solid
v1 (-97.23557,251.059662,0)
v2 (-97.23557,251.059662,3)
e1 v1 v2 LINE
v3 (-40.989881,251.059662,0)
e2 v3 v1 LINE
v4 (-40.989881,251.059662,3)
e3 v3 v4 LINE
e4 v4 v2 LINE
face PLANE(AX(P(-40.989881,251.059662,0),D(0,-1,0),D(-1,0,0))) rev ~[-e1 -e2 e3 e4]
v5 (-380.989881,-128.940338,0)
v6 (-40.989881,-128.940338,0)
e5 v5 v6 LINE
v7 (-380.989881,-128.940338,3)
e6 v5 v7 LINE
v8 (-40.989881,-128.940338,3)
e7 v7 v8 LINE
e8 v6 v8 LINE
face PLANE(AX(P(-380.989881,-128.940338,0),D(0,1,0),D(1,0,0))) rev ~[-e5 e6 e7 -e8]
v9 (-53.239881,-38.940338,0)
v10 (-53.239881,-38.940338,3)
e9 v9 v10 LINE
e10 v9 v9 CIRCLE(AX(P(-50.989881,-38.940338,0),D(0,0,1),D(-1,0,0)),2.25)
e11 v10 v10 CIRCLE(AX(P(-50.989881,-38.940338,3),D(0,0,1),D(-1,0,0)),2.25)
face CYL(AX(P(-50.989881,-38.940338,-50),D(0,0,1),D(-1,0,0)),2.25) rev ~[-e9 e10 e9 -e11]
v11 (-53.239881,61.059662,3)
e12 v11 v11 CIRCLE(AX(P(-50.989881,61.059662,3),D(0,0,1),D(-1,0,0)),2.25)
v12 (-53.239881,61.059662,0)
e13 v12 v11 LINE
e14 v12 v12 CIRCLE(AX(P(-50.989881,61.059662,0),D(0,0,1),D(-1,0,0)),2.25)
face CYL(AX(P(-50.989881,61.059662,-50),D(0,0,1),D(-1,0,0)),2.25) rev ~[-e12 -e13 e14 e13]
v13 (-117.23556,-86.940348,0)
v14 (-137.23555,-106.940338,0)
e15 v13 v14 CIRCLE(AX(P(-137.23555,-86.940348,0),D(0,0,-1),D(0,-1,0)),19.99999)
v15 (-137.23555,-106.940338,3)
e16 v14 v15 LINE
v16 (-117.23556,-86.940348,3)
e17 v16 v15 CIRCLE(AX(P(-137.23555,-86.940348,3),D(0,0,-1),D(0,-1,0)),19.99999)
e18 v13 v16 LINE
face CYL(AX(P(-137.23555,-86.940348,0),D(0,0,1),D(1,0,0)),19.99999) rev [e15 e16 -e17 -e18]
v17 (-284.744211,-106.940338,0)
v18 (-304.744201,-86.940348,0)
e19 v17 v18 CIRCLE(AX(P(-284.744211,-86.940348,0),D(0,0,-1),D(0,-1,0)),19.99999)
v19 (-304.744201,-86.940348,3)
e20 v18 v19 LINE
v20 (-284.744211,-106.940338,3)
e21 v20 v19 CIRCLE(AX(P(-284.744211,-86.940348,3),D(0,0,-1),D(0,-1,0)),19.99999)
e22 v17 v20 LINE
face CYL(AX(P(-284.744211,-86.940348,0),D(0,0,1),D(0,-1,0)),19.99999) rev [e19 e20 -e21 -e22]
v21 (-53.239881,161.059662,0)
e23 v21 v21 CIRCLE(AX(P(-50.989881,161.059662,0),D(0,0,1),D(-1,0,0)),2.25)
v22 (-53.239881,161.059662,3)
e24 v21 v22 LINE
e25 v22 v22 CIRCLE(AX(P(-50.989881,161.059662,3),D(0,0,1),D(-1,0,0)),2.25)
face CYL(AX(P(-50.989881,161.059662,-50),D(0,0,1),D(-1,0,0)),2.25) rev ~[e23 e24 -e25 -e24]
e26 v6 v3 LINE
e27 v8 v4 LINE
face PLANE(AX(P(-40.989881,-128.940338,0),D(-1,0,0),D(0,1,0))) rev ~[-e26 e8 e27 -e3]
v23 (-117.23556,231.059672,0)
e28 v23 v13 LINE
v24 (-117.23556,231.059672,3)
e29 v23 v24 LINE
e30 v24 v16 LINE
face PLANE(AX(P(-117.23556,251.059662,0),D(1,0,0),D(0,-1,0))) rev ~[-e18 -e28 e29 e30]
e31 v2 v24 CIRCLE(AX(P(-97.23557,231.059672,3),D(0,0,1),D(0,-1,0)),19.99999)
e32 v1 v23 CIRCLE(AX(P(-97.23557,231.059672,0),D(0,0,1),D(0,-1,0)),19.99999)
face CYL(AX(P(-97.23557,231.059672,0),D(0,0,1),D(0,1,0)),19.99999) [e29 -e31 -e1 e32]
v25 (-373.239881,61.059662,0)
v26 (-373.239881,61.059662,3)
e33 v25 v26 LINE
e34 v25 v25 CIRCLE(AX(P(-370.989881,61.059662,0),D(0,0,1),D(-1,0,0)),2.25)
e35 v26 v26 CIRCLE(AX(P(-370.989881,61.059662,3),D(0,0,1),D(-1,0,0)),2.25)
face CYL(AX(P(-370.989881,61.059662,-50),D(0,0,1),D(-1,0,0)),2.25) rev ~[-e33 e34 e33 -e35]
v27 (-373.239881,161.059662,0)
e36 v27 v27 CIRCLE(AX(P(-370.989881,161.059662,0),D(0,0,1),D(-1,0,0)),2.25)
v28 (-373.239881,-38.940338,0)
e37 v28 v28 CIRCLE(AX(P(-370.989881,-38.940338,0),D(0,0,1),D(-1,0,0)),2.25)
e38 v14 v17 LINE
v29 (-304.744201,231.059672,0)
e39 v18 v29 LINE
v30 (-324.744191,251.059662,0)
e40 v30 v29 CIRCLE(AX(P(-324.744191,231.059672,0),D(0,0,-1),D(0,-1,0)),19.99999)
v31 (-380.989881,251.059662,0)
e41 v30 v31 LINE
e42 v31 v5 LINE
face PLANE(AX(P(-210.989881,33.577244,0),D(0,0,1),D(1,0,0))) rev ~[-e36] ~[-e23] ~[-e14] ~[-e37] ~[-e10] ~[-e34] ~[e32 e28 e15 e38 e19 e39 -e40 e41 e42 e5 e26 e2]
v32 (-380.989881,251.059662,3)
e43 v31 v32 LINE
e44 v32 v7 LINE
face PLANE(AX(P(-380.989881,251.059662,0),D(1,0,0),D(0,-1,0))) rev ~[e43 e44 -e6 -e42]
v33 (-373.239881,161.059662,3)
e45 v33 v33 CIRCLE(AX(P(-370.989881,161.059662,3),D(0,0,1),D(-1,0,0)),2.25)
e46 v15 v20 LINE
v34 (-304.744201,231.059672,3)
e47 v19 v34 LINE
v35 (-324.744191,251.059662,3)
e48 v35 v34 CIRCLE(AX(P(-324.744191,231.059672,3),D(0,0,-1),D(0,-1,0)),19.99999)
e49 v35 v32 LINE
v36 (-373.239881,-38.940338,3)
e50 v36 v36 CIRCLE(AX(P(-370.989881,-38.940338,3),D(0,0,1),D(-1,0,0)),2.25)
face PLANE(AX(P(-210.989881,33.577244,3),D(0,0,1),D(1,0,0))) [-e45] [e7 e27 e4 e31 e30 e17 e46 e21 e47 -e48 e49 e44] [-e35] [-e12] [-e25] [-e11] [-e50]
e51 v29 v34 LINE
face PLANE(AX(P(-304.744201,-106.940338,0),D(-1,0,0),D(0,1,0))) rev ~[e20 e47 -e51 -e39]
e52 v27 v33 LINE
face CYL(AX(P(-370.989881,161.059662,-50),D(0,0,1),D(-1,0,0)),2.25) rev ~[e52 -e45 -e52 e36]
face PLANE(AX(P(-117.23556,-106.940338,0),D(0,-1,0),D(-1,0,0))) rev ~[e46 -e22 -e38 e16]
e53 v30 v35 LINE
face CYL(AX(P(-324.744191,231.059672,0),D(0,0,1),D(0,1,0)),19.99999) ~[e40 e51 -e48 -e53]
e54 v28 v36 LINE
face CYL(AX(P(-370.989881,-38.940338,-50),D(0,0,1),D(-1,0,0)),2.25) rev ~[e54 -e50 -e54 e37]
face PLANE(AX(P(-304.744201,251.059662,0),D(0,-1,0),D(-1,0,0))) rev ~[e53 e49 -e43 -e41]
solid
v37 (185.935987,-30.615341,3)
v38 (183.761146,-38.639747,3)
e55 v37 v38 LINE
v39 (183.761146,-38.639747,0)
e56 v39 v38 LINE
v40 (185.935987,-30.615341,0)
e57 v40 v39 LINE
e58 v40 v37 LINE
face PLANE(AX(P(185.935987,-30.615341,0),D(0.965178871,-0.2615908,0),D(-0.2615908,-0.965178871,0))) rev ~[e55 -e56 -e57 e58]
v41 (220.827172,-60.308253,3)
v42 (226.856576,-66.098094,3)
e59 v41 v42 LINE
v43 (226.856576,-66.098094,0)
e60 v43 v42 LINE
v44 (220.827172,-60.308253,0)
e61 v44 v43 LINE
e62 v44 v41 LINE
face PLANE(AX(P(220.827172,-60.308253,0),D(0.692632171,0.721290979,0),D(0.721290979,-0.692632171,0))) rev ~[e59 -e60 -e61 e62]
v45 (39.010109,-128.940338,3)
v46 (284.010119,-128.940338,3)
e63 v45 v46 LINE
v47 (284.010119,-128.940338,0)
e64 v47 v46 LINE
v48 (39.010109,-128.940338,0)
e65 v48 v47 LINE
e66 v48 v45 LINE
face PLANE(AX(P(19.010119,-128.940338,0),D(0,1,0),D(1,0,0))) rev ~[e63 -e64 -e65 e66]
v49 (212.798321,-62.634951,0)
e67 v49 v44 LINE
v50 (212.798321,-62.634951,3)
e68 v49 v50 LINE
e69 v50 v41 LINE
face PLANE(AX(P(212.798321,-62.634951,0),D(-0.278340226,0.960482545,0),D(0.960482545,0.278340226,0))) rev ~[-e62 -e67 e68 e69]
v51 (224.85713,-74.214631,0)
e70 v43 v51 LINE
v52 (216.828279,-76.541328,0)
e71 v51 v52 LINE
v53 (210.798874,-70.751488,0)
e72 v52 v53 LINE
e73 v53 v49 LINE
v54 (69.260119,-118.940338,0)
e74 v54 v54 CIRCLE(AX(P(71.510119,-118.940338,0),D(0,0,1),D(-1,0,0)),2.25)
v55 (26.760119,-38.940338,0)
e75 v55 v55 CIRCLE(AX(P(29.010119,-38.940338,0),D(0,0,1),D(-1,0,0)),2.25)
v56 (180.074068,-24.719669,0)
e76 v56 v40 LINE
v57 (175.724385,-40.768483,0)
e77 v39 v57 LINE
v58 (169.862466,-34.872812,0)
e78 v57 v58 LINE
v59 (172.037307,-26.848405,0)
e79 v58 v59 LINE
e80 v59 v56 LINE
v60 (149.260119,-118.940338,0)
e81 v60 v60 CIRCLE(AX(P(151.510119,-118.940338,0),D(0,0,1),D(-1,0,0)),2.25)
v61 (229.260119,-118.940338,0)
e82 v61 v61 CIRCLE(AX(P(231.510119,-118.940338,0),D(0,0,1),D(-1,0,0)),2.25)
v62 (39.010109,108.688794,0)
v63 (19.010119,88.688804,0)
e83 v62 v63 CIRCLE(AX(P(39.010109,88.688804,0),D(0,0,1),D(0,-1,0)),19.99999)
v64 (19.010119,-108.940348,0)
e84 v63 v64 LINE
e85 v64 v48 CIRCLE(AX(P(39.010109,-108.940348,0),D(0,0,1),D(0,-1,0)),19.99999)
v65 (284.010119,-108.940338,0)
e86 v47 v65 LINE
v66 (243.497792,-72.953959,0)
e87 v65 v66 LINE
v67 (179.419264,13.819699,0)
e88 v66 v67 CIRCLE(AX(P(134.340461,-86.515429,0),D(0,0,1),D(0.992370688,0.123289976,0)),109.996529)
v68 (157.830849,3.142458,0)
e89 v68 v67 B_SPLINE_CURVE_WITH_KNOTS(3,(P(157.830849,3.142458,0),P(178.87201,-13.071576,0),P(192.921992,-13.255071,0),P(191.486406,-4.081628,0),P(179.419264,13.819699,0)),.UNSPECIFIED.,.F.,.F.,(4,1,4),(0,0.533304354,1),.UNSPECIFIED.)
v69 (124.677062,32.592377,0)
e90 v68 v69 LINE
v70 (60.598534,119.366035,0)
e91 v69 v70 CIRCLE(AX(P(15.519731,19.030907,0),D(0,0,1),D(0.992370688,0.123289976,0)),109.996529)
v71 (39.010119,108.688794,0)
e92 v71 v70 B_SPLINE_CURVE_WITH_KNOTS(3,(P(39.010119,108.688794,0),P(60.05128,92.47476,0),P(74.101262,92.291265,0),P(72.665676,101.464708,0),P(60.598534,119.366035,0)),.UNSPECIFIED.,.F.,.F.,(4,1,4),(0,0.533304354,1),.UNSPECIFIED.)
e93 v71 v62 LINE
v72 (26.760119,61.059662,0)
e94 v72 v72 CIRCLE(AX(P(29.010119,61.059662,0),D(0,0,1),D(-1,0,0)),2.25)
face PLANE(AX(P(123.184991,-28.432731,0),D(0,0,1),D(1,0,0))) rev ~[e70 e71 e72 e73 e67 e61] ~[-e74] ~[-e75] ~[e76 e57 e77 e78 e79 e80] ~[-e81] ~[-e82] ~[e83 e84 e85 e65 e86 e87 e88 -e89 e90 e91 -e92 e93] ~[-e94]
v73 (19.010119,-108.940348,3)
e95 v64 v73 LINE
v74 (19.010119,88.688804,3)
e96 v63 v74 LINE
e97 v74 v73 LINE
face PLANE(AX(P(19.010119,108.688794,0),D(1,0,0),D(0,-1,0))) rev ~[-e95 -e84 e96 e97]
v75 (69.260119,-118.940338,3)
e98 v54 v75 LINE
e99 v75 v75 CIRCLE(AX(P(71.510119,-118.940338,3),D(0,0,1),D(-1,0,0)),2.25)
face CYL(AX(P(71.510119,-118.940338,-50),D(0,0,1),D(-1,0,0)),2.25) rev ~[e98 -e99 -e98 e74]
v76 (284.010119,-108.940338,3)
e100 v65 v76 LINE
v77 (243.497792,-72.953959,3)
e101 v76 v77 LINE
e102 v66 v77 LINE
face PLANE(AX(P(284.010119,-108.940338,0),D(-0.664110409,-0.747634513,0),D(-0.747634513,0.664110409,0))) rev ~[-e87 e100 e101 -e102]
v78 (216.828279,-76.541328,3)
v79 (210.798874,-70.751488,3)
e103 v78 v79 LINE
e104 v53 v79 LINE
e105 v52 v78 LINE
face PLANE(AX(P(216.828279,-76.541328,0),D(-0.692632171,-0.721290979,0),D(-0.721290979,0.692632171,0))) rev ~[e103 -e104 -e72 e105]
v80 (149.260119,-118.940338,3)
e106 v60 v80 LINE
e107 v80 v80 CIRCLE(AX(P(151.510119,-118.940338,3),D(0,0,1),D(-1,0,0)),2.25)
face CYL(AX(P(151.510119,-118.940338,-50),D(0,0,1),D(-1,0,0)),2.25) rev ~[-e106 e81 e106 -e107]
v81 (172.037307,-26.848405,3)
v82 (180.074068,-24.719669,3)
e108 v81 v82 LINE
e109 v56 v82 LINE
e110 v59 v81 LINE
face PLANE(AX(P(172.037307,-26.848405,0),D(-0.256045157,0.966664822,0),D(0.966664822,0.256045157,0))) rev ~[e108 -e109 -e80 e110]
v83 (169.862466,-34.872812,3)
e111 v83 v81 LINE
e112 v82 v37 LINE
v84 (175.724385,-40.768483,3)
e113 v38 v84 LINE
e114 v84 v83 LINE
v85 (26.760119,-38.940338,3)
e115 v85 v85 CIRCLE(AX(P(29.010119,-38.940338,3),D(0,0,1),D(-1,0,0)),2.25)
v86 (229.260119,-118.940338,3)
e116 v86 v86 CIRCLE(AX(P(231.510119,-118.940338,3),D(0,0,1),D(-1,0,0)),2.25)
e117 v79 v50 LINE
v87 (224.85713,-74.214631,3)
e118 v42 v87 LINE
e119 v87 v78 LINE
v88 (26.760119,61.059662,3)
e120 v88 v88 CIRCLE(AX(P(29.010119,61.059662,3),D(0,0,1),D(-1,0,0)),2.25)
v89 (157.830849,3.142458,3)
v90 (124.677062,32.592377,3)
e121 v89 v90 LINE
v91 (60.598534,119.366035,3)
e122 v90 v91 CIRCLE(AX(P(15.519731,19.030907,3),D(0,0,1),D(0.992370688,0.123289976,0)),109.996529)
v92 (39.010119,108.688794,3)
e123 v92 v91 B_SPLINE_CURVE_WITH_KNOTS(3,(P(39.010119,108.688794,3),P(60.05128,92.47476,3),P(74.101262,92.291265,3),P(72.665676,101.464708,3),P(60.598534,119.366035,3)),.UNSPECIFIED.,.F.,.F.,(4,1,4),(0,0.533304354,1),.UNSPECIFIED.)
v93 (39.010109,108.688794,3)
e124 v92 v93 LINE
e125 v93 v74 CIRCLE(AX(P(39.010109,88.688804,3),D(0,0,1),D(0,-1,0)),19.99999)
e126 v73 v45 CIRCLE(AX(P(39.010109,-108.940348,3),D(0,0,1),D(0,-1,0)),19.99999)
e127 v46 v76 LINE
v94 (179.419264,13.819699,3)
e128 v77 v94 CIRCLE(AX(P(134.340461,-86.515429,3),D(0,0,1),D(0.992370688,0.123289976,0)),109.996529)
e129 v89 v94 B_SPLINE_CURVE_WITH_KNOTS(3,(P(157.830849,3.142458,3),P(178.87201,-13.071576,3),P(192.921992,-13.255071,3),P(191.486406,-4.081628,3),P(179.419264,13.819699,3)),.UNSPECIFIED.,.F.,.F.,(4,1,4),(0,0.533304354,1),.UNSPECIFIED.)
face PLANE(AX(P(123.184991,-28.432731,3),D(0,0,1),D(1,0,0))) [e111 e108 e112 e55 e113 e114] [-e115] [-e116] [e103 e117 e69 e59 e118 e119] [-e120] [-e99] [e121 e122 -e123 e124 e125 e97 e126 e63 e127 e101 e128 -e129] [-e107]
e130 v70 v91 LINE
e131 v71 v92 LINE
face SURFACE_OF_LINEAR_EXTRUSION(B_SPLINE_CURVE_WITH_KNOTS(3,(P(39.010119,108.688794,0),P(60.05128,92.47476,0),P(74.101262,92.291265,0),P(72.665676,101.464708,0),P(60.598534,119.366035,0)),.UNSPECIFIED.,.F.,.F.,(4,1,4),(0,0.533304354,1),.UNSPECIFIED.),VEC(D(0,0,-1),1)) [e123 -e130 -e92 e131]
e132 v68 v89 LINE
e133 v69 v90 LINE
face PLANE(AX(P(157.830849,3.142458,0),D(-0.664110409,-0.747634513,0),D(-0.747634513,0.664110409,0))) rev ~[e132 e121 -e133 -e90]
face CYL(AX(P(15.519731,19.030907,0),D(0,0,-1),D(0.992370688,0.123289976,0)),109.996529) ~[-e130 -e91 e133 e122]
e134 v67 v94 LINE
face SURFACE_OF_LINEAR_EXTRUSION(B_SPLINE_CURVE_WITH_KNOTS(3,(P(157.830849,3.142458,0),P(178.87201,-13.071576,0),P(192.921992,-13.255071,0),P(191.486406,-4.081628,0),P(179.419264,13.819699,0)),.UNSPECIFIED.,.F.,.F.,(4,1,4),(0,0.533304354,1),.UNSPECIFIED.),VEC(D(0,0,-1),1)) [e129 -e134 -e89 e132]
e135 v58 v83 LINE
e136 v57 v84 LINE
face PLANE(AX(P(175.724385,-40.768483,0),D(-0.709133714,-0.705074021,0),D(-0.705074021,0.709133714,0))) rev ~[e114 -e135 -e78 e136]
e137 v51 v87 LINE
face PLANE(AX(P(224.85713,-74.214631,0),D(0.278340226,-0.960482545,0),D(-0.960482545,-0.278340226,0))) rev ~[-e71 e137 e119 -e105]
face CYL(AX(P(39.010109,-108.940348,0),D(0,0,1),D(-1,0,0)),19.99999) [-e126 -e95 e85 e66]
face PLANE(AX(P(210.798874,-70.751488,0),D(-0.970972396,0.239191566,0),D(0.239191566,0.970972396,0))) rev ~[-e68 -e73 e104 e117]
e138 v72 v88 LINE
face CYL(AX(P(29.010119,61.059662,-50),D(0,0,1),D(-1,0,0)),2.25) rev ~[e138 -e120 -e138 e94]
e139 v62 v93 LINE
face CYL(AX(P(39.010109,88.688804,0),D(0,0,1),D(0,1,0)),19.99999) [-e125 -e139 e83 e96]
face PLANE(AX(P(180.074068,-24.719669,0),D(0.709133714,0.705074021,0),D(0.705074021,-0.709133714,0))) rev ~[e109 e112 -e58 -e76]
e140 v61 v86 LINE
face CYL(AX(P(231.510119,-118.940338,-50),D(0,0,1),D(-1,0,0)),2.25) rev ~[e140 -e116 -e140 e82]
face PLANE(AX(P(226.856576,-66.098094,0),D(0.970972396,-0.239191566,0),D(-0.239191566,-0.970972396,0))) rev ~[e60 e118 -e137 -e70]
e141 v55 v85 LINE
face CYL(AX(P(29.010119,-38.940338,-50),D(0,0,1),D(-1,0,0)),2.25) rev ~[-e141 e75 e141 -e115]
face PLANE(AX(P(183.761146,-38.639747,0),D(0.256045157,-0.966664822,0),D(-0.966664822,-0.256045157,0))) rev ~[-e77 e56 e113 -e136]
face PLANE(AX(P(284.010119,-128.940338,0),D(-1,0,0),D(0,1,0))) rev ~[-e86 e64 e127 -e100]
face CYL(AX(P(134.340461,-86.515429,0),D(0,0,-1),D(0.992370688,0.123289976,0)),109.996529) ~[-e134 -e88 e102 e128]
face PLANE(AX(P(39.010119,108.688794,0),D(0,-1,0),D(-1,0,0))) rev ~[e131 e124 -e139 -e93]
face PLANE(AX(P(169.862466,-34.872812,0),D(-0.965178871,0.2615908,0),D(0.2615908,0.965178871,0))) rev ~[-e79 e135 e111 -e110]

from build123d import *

# Parameters (mm, degrees)
F1_DEPTH   = 3
F2_D       = 4.5
F2_DEPTH   = 50
F2_TIP     = 1.3519363928
F2_2_D     = 4.5
F2_2_DEPTH = 50
F2_2_TIP   = 1.3519363928
F3_R       = 19.99999
F3_2_R     = 19.99999


# Not quite as in the source:
# - a fillet or chamfer is up to 0.001 mm smaller than in the source, because OpenCascade refuses the exact size


with BuildPart() as f1:
    # F0 (on Top) → F1 (new body)
    with BuildSketch(Plane.XY):
        Polygon((-40.9898807008, -128.9403379118), (-40.9898807008, 251.0596620882), (-117.2355602426, 251.0596620882), (-117.2355602426, -106.9403379118), (-304.744201159, -106.9403379118), (-304.744201159, 251.0596620882), (-380.9898807008, 251.0596620882), (-380.9898807008, -128.9403379118), align=None)
    extrude(amount=F1_DEPTH)

    # F2
    with Locations(Plane(origin=(0, 0, 0), x_dir=(1, 0, 0), z_dir=(0, 0, -1))):
        with Locations((29.0101192992, 38.9403379118), (71.5101192992, 118.9403379118), (29.0101192992, -61.0596620882), (29.0101192992, -161.0596620882), (71.5101192992, -241.0596620882), (151.5101192992, -241.0596620882), (231.5101192992, -241.0596620882), (151.5101192992, 118.9403379118), (231.5101192992, 118.9403379118), (-50.9898807008, -161.0596620882), (-50.9898807008, -61.0596620882), (-50.9898807008, 38.9403379118), (-370.9898807008, 38.9403379118), (-370.9898807008, -61.0596620882), (-370.9898807008, -161.0596620882)):
            Hole(F2_D / 2, depth=F2_DEPTH)
            with Locations((0, 0, -(F2_DEPTH + F2_TIP / 2))):  # 118° drill point
                Cone(0, F2_D / 2, F2_TIP, mode=Mode.SUBTRACT)

    # F3 (radius 20 in the source; OpenCascade refuses exactly that, so slightly less here)
    f3_edges = [f1.edges().sort_by_distance(p)[0] for p in [
        (-304.744201, -106.940338, 1.5),
        (-117.23556, -106.940338, 1.5),
        (-304.744201, 251.059662, 1.5),
        (-117.23556, 251.059662, 1.5),
    ]]
    fillet(f3_edges, radius=F3_R)


with BuildPart() as f1b:
    # F0 (on Top) → F1, piece 2 (new body)
    with BuildSketch(Plane.XY):
        with BuildLine():
            Line((39.0101192992, 108.6887940764), (19.0101192992, 108.6887940764))
            Line((19.0101192992, 108.6887940764), (19.0101192992, -128.9403379118))
            Line((19.0101192992, -128.9403379118), (284.0101192992, -128.9403379118))
            Line((284.0101192992, -128.9403379118), (284.0101192992, -108.9403379118))
            Line((284.0101192992, -108.9403379118), (243.4977915589, -72.953959459))
            ThreePointArc((243.4977915589, -72.953959459), (222.8255621797, -21.1730754944), (179.4192635913, 13.8196988242))
            add(Edge.make_bspline(
                [(157.8308492899, 3.1424580353), (178.8720103613, -13.0715758613), (192.9219916812, -13.2550713495), (191.4864058539, -4.0816277466), (179.4192635913, 13.8196988242)],
                knots=[0, 0, 0, 0, 0.5333043536, 1, 1, 1, 1], degree=3))
            Line((157.8308492899, 3.1424580353), (124.6770615683, 32.5923765821))
            ThreePointArc((124.6770615683, 32.5923765821), (104.0048321891, 84.3732605468), (60.5985336006, 119.3660348654))
            add(Edge.make_bspline(
                [(39.0101192992, 108.6887940764), (60.0512803706, 92.4747601798), (74.1012616905, 92.2912646916), (72.6656758632, 101.4647082946), (60.5985336006, 119.3660348654)],
                knots=[0, 0, 0, 0, 0.5333043536, 1, 1, 1, 1], degree=3))
        make_face()
        Polygon((183.7611458661, -38.6397473267), (175.7243851541, -40.7684827608), (169.8624658343, -34.872811537), (172.0373072265, -26.8484048792), (180.0740679385, -24.7196694452), (185.9359872583, -30.6153406689), align=None, mode=Mode.SUBTRACT)
        Polygon((212.7983209623, -62.6349506717), (220.8271718926, -60.3082533353), (226.856576358, -66.0980935359), (224.8571298931, -74.2146310729), (216.8282789629, -76.5413284094), (210.7988744974, -70.7514882088), align=None, mode=Mode.SUBTRACT)
    extrude(amount=F1_DEPTH)

    # F2#2
    with Locations(Plane(origin=(0, 0, 0), x_dir=(1, 0, 0), z_dir=(0, 0, -1))):
        with Locations((29.0101192992, 38.9403379118), (71.5101192992, 118.9403379118), (29.0101192992, -61.0596620882), (29.0101192992, -161.0596620882), (71.5101192992, -241.0596620882), (151.5101192992, -241.0596620882), (231.5101192992, -241.0596620882), (151.5101192992, 118.9403379118), (231.5101192992, 118.9403379118), (-50.9898807008, -161.0596620882), (-50.9898807008, -61.0596620882), (-50.9898807008, 38.9403379118), (-370.9898807008, 38.9403379118), (-370.9898807008, -61.0596620882), (-370.9898807008, -161.0596620882)):
            Hole(F2_2_D / 2, depth=F2_2_DEPTH)
            with Locations((0, 0, -(F2_2_DEPTH + F2_2_TIP / 2))):  # 118° drill point
                Cone(0, F2_2_D / 2, F2_2_TIP, mode=Mode.SUBTRACT)

    # F3#2 (radius 20 in the source; OpenCascade refuses exactly that, so slightly less here)
    f3_2_edges = [f1b.edges().sort_by_distance(p)[0] for p in [
        (19.010119, -128.940338, 1.5),
        (19.010119, 108.688794, 1.5),
    ]]
    fillet(f3_2_edges, radius=F3_2_R)


solid = Compound([f1.part, f1b.part])
